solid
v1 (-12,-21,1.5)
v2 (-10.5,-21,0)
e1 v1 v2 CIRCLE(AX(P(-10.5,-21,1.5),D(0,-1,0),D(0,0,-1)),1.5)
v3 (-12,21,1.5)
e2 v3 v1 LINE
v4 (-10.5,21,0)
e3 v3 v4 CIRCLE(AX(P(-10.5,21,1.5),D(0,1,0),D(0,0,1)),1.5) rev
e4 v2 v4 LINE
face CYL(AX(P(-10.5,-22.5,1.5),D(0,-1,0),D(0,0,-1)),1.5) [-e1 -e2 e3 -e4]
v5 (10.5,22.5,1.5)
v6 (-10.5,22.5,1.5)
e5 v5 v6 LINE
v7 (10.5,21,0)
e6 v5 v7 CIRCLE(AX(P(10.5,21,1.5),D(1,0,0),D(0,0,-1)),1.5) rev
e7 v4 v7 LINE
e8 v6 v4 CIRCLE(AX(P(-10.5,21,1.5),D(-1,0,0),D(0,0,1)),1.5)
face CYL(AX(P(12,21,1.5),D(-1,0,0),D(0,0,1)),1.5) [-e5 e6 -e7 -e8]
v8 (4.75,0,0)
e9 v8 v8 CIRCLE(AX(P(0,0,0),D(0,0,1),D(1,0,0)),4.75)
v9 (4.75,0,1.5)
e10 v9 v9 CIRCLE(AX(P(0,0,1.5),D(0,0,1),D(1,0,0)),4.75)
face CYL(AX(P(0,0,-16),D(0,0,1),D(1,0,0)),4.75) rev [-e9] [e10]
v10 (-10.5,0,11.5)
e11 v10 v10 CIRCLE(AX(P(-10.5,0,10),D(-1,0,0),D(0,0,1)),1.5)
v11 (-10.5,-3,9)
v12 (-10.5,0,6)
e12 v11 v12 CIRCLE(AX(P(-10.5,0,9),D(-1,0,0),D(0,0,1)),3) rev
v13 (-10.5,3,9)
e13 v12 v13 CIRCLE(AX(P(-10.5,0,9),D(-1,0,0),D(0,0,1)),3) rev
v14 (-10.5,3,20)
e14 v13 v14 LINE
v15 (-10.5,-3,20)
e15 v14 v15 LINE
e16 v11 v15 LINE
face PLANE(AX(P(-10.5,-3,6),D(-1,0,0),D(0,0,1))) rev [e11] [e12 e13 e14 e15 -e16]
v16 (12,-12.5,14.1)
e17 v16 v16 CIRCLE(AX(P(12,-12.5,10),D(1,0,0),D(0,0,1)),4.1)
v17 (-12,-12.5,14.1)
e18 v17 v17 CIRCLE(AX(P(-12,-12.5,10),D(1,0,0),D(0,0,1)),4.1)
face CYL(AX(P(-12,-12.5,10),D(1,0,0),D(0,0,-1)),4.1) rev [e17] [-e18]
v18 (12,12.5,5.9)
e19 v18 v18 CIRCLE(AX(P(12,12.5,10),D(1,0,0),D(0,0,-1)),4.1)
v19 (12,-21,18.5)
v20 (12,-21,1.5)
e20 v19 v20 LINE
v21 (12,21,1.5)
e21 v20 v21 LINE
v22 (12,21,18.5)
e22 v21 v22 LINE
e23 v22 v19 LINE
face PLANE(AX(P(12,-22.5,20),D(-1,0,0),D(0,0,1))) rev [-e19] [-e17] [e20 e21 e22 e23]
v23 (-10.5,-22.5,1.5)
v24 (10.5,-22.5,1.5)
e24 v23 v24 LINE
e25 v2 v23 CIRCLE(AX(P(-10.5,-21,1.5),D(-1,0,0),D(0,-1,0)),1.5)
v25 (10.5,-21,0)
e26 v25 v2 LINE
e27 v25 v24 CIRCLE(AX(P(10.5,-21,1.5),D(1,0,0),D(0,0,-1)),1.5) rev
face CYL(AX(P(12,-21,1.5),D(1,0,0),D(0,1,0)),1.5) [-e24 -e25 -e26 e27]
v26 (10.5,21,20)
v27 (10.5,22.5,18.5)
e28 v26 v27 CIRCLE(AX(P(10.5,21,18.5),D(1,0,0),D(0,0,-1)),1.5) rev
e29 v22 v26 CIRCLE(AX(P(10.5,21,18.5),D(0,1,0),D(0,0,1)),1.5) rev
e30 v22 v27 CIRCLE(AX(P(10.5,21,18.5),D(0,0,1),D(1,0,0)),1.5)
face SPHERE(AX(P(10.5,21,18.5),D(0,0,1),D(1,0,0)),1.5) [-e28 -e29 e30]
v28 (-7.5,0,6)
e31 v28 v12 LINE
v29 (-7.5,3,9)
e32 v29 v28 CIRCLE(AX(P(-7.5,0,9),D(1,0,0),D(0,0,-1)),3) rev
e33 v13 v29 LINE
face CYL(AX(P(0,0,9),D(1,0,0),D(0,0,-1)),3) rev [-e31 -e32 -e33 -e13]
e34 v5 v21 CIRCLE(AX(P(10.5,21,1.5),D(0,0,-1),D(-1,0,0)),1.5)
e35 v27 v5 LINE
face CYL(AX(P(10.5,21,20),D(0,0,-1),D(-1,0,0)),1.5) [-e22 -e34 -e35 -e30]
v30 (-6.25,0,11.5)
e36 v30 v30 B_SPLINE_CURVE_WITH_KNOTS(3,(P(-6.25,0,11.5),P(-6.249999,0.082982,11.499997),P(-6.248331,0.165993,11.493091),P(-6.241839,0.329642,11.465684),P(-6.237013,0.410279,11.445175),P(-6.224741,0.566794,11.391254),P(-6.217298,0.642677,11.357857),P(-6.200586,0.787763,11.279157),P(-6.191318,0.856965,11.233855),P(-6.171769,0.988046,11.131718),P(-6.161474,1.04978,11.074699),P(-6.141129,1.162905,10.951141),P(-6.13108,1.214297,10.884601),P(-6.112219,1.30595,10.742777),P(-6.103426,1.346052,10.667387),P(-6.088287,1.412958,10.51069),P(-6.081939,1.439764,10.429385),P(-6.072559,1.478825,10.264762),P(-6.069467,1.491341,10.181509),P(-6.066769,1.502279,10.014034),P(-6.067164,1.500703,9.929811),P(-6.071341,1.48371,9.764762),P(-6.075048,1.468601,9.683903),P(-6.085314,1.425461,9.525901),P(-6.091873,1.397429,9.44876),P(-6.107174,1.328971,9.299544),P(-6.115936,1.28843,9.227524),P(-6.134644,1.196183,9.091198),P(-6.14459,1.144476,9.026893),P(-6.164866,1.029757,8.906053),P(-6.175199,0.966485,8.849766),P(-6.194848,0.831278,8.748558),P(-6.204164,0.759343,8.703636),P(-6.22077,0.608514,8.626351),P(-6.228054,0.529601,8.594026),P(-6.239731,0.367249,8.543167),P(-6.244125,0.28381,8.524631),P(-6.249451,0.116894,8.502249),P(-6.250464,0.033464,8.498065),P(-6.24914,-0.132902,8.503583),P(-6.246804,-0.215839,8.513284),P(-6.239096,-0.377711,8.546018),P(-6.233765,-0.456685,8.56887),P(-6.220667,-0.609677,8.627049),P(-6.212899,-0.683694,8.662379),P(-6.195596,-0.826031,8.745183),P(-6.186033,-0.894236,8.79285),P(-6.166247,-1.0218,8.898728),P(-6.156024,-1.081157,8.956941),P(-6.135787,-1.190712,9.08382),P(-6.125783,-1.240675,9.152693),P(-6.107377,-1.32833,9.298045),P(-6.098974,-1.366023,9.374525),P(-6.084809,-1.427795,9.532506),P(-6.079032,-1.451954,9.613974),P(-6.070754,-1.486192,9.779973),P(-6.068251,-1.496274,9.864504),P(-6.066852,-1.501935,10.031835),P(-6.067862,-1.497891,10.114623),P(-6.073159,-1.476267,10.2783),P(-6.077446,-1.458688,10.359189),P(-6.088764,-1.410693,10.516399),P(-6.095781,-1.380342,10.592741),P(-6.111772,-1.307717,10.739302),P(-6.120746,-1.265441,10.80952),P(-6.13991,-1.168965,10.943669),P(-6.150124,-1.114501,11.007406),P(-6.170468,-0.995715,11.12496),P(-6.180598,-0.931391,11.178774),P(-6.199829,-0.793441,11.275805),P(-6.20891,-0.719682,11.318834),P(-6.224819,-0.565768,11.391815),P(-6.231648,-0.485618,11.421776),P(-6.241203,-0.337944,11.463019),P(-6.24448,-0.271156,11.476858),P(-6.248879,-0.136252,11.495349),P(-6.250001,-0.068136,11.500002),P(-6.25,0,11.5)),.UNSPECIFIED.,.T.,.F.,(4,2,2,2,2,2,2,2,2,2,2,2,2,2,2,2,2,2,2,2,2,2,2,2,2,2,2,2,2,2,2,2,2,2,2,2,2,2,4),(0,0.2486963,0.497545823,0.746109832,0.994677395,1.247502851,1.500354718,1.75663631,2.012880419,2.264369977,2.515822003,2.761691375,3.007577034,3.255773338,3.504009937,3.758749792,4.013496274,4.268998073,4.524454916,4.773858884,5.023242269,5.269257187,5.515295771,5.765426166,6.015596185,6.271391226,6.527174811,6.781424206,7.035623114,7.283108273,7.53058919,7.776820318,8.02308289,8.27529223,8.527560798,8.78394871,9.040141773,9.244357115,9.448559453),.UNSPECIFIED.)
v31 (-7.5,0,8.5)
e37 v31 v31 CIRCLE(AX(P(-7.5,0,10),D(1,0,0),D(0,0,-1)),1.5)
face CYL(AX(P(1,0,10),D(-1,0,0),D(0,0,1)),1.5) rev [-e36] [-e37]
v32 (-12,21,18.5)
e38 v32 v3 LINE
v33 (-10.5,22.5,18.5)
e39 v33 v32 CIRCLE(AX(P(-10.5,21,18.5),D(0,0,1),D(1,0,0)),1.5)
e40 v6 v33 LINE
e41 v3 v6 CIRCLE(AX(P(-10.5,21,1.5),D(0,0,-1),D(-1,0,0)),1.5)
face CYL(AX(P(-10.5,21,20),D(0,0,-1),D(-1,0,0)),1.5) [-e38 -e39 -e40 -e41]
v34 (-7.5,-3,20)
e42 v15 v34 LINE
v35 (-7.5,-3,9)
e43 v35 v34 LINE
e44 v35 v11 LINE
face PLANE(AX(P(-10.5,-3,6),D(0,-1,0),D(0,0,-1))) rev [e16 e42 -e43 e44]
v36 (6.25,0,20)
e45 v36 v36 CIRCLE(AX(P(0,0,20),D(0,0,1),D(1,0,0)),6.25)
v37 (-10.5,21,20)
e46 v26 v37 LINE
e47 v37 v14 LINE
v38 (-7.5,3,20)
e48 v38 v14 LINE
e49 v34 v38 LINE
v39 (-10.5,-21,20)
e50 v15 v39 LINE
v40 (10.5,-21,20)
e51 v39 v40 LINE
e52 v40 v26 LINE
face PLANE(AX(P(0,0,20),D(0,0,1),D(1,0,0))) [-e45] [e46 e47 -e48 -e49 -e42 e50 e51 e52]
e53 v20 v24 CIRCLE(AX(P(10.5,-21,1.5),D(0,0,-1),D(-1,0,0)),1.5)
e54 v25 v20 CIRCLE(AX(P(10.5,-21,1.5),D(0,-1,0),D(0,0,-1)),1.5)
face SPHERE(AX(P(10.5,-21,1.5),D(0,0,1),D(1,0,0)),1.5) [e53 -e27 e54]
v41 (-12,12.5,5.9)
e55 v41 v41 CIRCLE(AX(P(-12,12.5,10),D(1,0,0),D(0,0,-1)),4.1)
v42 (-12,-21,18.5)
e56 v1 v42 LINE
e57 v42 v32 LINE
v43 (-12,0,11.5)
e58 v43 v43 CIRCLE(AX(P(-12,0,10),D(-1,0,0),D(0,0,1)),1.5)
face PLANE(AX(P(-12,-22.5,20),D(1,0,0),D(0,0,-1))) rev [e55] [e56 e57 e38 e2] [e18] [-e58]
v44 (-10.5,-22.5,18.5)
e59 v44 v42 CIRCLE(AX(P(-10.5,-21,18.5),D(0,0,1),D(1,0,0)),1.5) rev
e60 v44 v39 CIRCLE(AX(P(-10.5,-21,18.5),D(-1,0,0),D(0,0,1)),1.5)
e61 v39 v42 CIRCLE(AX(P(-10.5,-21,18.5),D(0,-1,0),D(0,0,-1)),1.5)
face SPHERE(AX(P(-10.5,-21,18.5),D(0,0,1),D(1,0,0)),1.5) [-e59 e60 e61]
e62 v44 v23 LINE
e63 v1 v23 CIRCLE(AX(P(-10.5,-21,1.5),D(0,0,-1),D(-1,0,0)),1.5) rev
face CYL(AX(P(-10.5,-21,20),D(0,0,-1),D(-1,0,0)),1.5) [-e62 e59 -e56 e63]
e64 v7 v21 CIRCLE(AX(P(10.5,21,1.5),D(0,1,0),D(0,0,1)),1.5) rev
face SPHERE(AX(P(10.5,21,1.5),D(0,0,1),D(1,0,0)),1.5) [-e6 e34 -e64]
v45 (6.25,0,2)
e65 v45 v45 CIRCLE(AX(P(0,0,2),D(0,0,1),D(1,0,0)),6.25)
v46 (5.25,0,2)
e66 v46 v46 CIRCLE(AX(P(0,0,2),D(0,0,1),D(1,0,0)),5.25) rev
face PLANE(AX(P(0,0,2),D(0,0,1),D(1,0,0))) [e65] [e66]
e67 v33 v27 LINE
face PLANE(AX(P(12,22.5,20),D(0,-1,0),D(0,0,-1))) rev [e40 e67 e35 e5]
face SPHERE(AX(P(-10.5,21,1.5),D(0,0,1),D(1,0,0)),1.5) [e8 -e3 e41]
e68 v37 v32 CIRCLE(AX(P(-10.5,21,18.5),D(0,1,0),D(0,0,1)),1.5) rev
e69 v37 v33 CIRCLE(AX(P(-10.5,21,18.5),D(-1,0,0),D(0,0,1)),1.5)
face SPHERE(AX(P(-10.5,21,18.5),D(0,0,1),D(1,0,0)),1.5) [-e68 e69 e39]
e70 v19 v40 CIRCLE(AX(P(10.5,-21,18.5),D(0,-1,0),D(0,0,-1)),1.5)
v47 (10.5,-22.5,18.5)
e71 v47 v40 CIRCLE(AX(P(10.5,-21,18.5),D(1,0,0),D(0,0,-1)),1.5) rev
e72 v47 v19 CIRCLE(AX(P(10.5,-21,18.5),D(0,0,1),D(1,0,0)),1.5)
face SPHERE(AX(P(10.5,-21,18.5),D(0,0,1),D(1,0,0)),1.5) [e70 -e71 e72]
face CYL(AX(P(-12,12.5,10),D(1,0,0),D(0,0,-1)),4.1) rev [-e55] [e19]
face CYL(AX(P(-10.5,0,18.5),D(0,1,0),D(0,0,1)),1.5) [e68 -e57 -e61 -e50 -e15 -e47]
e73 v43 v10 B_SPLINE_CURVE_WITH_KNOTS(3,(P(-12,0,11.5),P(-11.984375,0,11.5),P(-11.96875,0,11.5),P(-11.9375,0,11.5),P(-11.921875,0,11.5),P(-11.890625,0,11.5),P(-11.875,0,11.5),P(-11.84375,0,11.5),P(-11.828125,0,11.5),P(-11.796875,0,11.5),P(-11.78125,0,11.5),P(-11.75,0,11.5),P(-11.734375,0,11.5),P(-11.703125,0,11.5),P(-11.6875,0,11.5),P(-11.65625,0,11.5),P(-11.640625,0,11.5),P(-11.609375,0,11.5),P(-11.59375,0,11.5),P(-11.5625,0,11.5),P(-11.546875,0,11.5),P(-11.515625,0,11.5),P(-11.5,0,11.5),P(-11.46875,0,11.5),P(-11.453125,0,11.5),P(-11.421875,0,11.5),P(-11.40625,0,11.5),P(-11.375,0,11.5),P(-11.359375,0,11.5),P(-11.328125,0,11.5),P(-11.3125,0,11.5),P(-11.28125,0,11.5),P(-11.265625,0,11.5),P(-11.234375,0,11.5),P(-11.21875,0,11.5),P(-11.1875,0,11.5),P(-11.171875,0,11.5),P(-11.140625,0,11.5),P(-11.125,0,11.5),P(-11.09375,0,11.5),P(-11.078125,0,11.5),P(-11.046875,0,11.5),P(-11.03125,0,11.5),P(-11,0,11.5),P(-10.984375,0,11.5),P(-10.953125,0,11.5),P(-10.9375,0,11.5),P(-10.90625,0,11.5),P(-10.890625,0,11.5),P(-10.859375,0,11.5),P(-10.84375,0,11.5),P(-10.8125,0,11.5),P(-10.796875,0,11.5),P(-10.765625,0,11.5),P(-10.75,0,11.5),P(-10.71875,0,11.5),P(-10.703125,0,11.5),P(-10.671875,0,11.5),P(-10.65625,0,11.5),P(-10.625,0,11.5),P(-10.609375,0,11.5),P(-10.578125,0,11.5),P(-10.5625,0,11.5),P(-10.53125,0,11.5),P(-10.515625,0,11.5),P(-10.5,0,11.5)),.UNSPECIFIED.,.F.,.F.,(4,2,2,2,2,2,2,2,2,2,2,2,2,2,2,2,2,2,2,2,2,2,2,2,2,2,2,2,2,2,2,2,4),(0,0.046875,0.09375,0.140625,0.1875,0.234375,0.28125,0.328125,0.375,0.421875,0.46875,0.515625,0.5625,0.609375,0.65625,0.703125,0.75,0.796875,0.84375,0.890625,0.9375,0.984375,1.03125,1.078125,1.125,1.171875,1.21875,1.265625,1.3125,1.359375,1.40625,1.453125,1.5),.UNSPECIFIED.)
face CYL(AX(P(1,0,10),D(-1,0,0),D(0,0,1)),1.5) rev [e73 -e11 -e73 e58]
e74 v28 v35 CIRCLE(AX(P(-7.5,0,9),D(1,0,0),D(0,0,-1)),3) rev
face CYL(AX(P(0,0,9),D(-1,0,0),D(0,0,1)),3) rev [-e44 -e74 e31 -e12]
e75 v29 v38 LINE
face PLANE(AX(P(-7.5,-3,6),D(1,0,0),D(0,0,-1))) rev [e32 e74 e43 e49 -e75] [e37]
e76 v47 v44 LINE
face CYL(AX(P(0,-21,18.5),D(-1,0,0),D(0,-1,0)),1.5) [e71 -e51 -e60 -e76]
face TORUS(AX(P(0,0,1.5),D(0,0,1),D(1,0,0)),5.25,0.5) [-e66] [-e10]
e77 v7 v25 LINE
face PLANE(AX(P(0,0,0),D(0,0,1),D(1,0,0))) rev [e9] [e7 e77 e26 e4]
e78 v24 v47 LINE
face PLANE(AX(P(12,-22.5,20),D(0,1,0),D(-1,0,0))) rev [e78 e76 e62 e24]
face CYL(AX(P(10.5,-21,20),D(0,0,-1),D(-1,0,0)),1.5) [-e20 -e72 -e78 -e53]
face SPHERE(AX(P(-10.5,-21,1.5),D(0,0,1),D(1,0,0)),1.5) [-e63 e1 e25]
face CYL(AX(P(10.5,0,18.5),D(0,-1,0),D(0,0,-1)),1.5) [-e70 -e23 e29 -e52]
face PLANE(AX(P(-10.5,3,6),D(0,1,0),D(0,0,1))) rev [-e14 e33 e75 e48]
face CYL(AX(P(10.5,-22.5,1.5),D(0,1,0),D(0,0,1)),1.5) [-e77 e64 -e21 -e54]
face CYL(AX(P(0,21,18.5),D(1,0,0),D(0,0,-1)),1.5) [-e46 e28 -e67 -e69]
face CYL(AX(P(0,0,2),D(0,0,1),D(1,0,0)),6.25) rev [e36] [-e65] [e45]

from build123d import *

# Parameters (mm, degrees)
SKETCH1_W      = 24
SKETCH1_H      = 45
EXTRUDE1_DEPTH = 20
SKETCH2_R      = 4.1
EXTRUDE2_DEPTH = 39.5
SKETCH3_R      = 6.25
EXTRUDE3_DEPTH = 18
SKETCH4_R      = 4.75
EXTRUDE4_DEPTH = 18
SKETCH5_W      = 3
SKETCH5_H      = 6
EXTRUDE5_DEPTH = 14
SKETCH6_R      = 1.5
EXTRUDE6_DEPTH = 13
FILLET1_R      = 1.5
FILLET2_R      = 0.5
FILLET3_R      = 3


with BuildPart() as part:
    # Sketch1 → Extrude1 (new body)
    with BuildSketch(Plane.XY):
        Rectangle(SKETCH1_W, SKETCH1_H)
    extrude(amount=EXTRUDE1_DEPTH)

    # Sketch2 → Extrude2 (cut, through all)
    with BuildSketch(Plane(origin=(12, 0, 0), x_dir=(0, 0, -1), z_dir=(1, 0, 0))):
        with Locations((-10, 12.5)):
            Circle(SKETCH2_R)
        with Locations(Location((-10, -12.5, 0), (0, 0, 180))):
            Circle(SKETCH2_R)
    extrude(amount=-EXTRUDE2_DEPTH, mode=Mode.SUBTRACT)

    # Sketch3 → Extrude3 (cut)
    with BuildSketch(Plane.XY.offset(20)):
        Circle(SKETCH3_R)
    extrude(amount=-EXTRUDE3_DEPTH, mode=Mode.SUBTRACT)

    # Sketch4 → Extrude4 (cut)
    with BuildSketch(Plane.XY.offset(2)):
        Circle(SKETCH4_R)
    extrude(amount=-EXTRUDE4_DEPTH, mode=Mode.SUBTRACT)

    # Sketch5 → Extrude5 (cut)
    with BuildSketch(Plane.XY.offset(20)):
        with Locations((-9, 0)):
            Rectangle(SKETCH5_W, SKETCH5_H)
    extrude(amount=-EXTRUDE5_DEPTH, mode=Mode.SUBTRACT)

    # Sketch6 → Extrude6 (cut)
    with BuildSketch(Plane.ZY.offset(12)):
        with Locations((10, 0)):
            Circle(SKETCH6_R)
    extrude(amount=-EXTRUDE6_DEPTH, mode=Mode.SUBTRACT)

    # Fillet1
    fillet1_edges = [part.edges().sort_by_distance(p)[0] for p in [
        (12, 0, 20),
        (0, 22.5, 20),
        (-12, 0, 20),
        (0, 22.5, 0),
        (12, 0, 0),
        (0, -22.5, 0),
        (-12, 0, 0),
        (0, -22.5, 20),
        (-12, 22.5, 10),
        (12, 22.5, 10),
        (12, -22.5, 10),
        (-12, -22.5, 10),
    ]]
    fillet(fillet1_edges, radius=FILLET1_R - 0.0001)  # a hair under: the kernel refuses the full size

    # Fillet2
    fillet2_edges = [part.edges().sort_by_distance(p)[0] for p in [
        (-4.75, 0, 2),
    ]]
    fillet(fillet2_edges, radius=FILLET2_R)

    # Fillet3
    fillet3_edges = [part.edges().sort_by_distance(p)[0] for p in [
        (-9, -3, 6),
        (-9, 3, 6),
    ]]
    fillet(fillet3_edges, radius=FILLET3_R - 0.0001)  # a hair under: the kernel refuses the full size


solid = part.part
